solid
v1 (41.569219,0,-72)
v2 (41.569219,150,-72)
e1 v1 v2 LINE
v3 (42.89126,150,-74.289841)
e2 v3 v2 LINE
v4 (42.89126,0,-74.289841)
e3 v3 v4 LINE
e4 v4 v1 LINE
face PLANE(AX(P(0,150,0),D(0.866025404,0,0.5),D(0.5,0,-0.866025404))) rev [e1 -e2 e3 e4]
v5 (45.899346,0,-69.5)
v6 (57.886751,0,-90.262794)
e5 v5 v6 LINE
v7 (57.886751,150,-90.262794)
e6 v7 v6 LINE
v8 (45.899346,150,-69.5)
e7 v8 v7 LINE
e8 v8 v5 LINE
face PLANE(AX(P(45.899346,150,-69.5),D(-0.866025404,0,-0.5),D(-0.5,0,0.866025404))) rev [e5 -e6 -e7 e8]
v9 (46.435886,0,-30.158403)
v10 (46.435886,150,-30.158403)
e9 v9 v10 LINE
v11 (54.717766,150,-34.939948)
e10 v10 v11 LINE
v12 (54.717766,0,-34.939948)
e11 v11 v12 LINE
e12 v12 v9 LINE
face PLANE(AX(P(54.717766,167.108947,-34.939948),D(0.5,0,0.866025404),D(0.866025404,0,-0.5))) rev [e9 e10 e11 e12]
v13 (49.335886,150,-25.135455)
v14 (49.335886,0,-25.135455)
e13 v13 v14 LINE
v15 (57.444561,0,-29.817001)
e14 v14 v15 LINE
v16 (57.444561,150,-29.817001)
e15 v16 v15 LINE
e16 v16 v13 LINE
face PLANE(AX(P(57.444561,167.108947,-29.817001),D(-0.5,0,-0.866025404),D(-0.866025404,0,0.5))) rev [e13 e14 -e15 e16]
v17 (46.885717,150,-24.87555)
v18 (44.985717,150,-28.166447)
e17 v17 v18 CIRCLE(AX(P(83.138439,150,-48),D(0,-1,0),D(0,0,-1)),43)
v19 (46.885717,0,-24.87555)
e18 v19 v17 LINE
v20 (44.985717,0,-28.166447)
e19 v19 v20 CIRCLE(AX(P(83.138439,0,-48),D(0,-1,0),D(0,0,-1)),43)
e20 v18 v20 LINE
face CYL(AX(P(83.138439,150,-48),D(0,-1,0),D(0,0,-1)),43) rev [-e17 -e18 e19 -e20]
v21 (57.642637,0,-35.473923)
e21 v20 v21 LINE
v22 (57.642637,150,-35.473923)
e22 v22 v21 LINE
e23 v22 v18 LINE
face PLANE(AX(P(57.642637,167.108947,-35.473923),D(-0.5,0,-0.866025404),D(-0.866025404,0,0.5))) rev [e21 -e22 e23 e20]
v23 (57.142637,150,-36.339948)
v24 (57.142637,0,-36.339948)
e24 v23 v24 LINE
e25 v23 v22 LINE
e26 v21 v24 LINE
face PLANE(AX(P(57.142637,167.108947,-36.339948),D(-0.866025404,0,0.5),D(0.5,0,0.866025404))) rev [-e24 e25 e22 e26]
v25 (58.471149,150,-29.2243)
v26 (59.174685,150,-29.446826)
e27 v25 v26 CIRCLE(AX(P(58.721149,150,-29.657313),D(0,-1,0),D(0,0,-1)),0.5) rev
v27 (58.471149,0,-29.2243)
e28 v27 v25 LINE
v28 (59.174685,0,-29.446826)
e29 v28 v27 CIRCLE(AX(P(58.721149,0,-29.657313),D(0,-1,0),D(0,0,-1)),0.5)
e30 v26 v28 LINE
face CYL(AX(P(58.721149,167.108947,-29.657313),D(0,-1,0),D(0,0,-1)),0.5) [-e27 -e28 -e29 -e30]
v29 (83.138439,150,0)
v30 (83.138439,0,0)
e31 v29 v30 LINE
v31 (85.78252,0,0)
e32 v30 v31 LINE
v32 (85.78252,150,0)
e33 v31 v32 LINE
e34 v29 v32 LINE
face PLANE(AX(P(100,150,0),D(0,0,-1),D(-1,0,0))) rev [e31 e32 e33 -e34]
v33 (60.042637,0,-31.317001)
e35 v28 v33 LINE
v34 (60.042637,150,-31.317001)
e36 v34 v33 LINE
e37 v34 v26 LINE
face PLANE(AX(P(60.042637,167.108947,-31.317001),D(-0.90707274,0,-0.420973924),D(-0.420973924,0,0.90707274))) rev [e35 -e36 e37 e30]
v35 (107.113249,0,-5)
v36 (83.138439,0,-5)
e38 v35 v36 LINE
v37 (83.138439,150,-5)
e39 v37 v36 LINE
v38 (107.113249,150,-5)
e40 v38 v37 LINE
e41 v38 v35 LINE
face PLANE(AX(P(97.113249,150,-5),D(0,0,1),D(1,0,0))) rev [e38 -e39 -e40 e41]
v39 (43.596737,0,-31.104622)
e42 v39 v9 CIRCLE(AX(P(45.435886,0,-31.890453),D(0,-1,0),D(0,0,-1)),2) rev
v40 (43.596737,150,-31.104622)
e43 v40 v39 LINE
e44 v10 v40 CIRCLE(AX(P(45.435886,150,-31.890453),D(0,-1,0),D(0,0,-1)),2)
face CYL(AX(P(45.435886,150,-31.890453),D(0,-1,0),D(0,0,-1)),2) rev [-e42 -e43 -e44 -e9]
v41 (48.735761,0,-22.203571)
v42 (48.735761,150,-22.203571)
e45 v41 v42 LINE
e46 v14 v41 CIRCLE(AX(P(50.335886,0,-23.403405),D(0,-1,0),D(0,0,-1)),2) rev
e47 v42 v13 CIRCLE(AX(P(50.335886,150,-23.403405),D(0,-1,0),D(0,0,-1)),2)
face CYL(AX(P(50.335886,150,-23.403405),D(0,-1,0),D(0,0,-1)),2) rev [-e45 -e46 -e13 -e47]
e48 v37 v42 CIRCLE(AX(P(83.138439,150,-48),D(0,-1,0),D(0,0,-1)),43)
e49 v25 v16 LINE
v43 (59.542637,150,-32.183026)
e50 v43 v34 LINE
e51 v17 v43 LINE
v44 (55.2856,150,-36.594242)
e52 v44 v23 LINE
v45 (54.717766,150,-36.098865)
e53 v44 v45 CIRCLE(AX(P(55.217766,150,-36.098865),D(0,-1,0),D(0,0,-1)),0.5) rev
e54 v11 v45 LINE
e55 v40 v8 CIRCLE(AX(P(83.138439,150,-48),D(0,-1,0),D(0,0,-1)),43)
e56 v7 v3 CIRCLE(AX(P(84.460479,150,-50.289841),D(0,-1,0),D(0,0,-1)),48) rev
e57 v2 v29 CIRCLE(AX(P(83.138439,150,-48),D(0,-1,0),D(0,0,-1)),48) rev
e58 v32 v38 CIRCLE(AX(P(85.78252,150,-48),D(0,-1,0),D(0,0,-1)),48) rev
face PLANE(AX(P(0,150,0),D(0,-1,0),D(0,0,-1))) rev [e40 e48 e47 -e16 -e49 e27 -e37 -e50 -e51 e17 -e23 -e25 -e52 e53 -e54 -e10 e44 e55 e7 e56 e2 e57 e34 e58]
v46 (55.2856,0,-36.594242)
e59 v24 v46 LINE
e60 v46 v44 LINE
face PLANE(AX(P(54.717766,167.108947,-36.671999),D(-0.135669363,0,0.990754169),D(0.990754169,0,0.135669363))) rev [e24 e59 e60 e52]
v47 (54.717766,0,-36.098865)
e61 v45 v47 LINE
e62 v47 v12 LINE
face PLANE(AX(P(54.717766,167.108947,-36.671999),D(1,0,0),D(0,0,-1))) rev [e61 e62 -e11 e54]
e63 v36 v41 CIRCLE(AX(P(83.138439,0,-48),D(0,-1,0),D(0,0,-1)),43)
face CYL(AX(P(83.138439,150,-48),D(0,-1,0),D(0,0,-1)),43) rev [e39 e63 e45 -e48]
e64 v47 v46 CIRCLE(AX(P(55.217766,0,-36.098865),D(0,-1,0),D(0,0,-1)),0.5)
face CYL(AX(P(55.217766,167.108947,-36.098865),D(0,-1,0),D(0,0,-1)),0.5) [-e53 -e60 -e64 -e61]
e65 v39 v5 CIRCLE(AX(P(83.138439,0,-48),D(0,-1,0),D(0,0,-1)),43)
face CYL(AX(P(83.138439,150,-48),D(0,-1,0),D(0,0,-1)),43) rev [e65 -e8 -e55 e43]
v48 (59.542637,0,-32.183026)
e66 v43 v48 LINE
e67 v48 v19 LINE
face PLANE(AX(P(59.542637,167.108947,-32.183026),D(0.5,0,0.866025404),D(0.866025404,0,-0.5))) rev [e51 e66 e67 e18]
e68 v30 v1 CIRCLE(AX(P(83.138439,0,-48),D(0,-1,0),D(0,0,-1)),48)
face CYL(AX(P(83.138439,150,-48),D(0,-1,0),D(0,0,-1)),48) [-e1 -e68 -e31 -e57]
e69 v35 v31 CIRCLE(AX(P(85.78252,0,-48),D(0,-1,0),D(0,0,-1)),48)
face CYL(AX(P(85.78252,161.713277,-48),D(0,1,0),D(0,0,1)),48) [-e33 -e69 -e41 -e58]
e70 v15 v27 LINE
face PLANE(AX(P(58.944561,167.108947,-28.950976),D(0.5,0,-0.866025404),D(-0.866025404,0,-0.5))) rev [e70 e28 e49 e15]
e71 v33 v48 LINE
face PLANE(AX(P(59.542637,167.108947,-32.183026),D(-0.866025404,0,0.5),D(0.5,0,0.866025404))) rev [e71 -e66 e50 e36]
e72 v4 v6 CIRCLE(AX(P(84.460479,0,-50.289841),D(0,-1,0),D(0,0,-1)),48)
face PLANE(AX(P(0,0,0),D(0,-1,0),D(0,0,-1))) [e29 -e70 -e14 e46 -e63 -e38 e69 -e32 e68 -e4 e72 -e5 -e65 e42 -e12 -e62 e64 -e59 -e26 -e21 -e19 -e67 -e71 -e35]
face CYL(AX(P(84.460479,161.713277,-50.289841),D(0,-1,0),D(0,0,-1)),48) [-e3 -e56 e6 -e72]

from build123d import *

# Parameters (mm, degrees)
BOSS_EXTRUDE1_DEPTH     = 150
FILLET1_R               = 48
CUT_EXTRUDE1_DEPTH      = 201
CUT_EXTRUDE1_DEPTH_BACK = 201
BOSS_EXTRUDE2_DEPTH     = 150
FILLET2_R               = 48
BOSS_EXTRUDE3_DEPTH     = 150
FILLET3_R               = 2
FILLET4_R               = 0.5


with BuildPart() as part:
    # Sketch1 → Boss-Extrude1 (new body)
    with BuildSketch(Plane(origin=(0, 0, 0), x_dir=(1, 0, 0), z_dir=(0, 1, 0))):
        Polygon((0, 0), (50, 86.602540378), (100, 0), align=None)
    extrude(amount=BOSS_EXTRUDE1_DEPTH)

    # Fillet1
    fillet1_edges = [part.edges().sort_by_distance(p)[0] for p in [
        (0, 75, 0),
    ]]
    fillet(fillet1_edges, radius=FILLET1_R)

    # Sketch3 → Cut-Extrude1 (cut, two sides: drawn at the far end of the back side and taken through both)
    with BuildSketch(Plane.XZ.offset(-CUT_EXTRUDE1_DEPTH_BACK)):
        with BuildLine():
            Line((45.899346401, -69.5), (52.886751346, -81.602540378))
            Line((52.886751346, -81.602540378), (97.113248654, -5))
            Line((97.113248654, -5), (83.138438763, -5))
            ThreePointArc((83.138438763, -5), (45.899346401, -26.5), (45.899346401, -69.5))
        make_face()
    extrude(amount=CUT_EXTRUDE1_DEPTH + CUT_EXTRUDE1_DEPTH_BACK, mode=Mode.SUBTRACT)

    # Sketch4 → Boss-Extrude2 (add)
    with BuildSketch(Plane(origin=(0, 0, 0), x_dir=(1, 0, 0), z_dir=(0, 1, 0))):
        Polygon((50, 86.602540378), (57.886751346, 90.262794416), (52.886751346, 81.602540378), align=None)
        Polygon((97.113248654, 5), (100, 0), (107.113248654, 5), align=None)
    extrude(amount=BOSS_EXTRUDE2_DEPTH)

    # Fillet2
    # the kernel refuses this fillet: 48 mm, written as the material it takes off along each edge
    with BuildSketch(Plane(origin=(50, -35.543700884, -86.602540378), x_dir=(-0.5000000000000046, 0, 0.8660254037844362), z_dir=(0, 1, 0))) as fillet2_piece_1:
        with BuildLine():
            CenterArc((14.217480354, 48), FILLET2_R, 243.615670251, 26.384329749)
            Line((-7.113248654, 5), (-7.539863234, 4.14))
            ThreePointArc((-7.539863234, 4.14), (-4.108682958, 1.714613937), (-0.552058631, -0.785386063))
            Line((-0.552058631, -0.785386063), (0, -0.96))
            Line((0, -0.96), (14.217480354, -0.96))
            Line((14.217480354, -0.96), (14.217480354, 0))
        make_face()
    extrude(amount=221.087401768, mode=Mode.SUBTRACT)
    with BuildSketch(Plane(origin=(100, -35.543700884, 0), x_dir=(-1, 0, 0), z_dir=(0, 1, 0))) as fillet2_piece_2:
        with BuildLine():
            CenterArc((14.217480354, -48), FILLET2_R, 90, 26.384329749)
            Line((-7.113248654, -5), (-7.539863234, -4.14))
            ThreePointArc((-7.539863234, -4.14), (-4.108682958, -1.714613937), (-0.552058631, 0.785386063))
            Line((-0.552058631, 0.785386063), (0, 0.96))
            Line((0, 0.96), (14.217480354, 0.96))
            Line((14.217480354, 0.96), (14.217480354, 0))
        make_face()
    extrude(amount=221.087401768, mode=Mode.SUBTRACT)

    # Sketch5 → Boss-Extrude3 (add)
    with BuildSketch(Plane(origin=(0, 0, 0), x_dir=(1, 0, 0), z_dir=(0, 1, 0))):
        Polygon((54.717765705, 36.671999128), (57.142636836, 36.339948321), (57.642636836, 35.473922917), (43.850262737, 27.510892018), (43.385383074, 28.397194158), (54.717765705, 34.939948321), align=None)
        Polygon((59.542636836, 32.183026382), (60.042636836, 31.317000979), (58.944560624, 28.950975575), (57.444560624, 29.817000979), (45.904890393, 23.154569264), (45.509810975, 24.081170595), align=None)
    extrude(amount=BOSS_EXTRUDE3_DEPTH)

    # Fillet3
    fillet3_edges = [part.edges().sort_by_distance(p)[0] for p in [
        (44.534132149, 75, -29.060424746),
        (47.434132149, 75, -24.037477404),
    ]]
    fillet(fillet3_edges, radius=FILLET3_R)

    # Fillet4
    fillet4_edges = [part.edges().sort_by_distance(p)[0] for p in [
        (54.717765705, 75, -36.671999128),
        (58.944560624, 75, -28.950975575),
    ]]
    fillet(fillet4_edges, radius=FILLET4_R)


solid = part.part
